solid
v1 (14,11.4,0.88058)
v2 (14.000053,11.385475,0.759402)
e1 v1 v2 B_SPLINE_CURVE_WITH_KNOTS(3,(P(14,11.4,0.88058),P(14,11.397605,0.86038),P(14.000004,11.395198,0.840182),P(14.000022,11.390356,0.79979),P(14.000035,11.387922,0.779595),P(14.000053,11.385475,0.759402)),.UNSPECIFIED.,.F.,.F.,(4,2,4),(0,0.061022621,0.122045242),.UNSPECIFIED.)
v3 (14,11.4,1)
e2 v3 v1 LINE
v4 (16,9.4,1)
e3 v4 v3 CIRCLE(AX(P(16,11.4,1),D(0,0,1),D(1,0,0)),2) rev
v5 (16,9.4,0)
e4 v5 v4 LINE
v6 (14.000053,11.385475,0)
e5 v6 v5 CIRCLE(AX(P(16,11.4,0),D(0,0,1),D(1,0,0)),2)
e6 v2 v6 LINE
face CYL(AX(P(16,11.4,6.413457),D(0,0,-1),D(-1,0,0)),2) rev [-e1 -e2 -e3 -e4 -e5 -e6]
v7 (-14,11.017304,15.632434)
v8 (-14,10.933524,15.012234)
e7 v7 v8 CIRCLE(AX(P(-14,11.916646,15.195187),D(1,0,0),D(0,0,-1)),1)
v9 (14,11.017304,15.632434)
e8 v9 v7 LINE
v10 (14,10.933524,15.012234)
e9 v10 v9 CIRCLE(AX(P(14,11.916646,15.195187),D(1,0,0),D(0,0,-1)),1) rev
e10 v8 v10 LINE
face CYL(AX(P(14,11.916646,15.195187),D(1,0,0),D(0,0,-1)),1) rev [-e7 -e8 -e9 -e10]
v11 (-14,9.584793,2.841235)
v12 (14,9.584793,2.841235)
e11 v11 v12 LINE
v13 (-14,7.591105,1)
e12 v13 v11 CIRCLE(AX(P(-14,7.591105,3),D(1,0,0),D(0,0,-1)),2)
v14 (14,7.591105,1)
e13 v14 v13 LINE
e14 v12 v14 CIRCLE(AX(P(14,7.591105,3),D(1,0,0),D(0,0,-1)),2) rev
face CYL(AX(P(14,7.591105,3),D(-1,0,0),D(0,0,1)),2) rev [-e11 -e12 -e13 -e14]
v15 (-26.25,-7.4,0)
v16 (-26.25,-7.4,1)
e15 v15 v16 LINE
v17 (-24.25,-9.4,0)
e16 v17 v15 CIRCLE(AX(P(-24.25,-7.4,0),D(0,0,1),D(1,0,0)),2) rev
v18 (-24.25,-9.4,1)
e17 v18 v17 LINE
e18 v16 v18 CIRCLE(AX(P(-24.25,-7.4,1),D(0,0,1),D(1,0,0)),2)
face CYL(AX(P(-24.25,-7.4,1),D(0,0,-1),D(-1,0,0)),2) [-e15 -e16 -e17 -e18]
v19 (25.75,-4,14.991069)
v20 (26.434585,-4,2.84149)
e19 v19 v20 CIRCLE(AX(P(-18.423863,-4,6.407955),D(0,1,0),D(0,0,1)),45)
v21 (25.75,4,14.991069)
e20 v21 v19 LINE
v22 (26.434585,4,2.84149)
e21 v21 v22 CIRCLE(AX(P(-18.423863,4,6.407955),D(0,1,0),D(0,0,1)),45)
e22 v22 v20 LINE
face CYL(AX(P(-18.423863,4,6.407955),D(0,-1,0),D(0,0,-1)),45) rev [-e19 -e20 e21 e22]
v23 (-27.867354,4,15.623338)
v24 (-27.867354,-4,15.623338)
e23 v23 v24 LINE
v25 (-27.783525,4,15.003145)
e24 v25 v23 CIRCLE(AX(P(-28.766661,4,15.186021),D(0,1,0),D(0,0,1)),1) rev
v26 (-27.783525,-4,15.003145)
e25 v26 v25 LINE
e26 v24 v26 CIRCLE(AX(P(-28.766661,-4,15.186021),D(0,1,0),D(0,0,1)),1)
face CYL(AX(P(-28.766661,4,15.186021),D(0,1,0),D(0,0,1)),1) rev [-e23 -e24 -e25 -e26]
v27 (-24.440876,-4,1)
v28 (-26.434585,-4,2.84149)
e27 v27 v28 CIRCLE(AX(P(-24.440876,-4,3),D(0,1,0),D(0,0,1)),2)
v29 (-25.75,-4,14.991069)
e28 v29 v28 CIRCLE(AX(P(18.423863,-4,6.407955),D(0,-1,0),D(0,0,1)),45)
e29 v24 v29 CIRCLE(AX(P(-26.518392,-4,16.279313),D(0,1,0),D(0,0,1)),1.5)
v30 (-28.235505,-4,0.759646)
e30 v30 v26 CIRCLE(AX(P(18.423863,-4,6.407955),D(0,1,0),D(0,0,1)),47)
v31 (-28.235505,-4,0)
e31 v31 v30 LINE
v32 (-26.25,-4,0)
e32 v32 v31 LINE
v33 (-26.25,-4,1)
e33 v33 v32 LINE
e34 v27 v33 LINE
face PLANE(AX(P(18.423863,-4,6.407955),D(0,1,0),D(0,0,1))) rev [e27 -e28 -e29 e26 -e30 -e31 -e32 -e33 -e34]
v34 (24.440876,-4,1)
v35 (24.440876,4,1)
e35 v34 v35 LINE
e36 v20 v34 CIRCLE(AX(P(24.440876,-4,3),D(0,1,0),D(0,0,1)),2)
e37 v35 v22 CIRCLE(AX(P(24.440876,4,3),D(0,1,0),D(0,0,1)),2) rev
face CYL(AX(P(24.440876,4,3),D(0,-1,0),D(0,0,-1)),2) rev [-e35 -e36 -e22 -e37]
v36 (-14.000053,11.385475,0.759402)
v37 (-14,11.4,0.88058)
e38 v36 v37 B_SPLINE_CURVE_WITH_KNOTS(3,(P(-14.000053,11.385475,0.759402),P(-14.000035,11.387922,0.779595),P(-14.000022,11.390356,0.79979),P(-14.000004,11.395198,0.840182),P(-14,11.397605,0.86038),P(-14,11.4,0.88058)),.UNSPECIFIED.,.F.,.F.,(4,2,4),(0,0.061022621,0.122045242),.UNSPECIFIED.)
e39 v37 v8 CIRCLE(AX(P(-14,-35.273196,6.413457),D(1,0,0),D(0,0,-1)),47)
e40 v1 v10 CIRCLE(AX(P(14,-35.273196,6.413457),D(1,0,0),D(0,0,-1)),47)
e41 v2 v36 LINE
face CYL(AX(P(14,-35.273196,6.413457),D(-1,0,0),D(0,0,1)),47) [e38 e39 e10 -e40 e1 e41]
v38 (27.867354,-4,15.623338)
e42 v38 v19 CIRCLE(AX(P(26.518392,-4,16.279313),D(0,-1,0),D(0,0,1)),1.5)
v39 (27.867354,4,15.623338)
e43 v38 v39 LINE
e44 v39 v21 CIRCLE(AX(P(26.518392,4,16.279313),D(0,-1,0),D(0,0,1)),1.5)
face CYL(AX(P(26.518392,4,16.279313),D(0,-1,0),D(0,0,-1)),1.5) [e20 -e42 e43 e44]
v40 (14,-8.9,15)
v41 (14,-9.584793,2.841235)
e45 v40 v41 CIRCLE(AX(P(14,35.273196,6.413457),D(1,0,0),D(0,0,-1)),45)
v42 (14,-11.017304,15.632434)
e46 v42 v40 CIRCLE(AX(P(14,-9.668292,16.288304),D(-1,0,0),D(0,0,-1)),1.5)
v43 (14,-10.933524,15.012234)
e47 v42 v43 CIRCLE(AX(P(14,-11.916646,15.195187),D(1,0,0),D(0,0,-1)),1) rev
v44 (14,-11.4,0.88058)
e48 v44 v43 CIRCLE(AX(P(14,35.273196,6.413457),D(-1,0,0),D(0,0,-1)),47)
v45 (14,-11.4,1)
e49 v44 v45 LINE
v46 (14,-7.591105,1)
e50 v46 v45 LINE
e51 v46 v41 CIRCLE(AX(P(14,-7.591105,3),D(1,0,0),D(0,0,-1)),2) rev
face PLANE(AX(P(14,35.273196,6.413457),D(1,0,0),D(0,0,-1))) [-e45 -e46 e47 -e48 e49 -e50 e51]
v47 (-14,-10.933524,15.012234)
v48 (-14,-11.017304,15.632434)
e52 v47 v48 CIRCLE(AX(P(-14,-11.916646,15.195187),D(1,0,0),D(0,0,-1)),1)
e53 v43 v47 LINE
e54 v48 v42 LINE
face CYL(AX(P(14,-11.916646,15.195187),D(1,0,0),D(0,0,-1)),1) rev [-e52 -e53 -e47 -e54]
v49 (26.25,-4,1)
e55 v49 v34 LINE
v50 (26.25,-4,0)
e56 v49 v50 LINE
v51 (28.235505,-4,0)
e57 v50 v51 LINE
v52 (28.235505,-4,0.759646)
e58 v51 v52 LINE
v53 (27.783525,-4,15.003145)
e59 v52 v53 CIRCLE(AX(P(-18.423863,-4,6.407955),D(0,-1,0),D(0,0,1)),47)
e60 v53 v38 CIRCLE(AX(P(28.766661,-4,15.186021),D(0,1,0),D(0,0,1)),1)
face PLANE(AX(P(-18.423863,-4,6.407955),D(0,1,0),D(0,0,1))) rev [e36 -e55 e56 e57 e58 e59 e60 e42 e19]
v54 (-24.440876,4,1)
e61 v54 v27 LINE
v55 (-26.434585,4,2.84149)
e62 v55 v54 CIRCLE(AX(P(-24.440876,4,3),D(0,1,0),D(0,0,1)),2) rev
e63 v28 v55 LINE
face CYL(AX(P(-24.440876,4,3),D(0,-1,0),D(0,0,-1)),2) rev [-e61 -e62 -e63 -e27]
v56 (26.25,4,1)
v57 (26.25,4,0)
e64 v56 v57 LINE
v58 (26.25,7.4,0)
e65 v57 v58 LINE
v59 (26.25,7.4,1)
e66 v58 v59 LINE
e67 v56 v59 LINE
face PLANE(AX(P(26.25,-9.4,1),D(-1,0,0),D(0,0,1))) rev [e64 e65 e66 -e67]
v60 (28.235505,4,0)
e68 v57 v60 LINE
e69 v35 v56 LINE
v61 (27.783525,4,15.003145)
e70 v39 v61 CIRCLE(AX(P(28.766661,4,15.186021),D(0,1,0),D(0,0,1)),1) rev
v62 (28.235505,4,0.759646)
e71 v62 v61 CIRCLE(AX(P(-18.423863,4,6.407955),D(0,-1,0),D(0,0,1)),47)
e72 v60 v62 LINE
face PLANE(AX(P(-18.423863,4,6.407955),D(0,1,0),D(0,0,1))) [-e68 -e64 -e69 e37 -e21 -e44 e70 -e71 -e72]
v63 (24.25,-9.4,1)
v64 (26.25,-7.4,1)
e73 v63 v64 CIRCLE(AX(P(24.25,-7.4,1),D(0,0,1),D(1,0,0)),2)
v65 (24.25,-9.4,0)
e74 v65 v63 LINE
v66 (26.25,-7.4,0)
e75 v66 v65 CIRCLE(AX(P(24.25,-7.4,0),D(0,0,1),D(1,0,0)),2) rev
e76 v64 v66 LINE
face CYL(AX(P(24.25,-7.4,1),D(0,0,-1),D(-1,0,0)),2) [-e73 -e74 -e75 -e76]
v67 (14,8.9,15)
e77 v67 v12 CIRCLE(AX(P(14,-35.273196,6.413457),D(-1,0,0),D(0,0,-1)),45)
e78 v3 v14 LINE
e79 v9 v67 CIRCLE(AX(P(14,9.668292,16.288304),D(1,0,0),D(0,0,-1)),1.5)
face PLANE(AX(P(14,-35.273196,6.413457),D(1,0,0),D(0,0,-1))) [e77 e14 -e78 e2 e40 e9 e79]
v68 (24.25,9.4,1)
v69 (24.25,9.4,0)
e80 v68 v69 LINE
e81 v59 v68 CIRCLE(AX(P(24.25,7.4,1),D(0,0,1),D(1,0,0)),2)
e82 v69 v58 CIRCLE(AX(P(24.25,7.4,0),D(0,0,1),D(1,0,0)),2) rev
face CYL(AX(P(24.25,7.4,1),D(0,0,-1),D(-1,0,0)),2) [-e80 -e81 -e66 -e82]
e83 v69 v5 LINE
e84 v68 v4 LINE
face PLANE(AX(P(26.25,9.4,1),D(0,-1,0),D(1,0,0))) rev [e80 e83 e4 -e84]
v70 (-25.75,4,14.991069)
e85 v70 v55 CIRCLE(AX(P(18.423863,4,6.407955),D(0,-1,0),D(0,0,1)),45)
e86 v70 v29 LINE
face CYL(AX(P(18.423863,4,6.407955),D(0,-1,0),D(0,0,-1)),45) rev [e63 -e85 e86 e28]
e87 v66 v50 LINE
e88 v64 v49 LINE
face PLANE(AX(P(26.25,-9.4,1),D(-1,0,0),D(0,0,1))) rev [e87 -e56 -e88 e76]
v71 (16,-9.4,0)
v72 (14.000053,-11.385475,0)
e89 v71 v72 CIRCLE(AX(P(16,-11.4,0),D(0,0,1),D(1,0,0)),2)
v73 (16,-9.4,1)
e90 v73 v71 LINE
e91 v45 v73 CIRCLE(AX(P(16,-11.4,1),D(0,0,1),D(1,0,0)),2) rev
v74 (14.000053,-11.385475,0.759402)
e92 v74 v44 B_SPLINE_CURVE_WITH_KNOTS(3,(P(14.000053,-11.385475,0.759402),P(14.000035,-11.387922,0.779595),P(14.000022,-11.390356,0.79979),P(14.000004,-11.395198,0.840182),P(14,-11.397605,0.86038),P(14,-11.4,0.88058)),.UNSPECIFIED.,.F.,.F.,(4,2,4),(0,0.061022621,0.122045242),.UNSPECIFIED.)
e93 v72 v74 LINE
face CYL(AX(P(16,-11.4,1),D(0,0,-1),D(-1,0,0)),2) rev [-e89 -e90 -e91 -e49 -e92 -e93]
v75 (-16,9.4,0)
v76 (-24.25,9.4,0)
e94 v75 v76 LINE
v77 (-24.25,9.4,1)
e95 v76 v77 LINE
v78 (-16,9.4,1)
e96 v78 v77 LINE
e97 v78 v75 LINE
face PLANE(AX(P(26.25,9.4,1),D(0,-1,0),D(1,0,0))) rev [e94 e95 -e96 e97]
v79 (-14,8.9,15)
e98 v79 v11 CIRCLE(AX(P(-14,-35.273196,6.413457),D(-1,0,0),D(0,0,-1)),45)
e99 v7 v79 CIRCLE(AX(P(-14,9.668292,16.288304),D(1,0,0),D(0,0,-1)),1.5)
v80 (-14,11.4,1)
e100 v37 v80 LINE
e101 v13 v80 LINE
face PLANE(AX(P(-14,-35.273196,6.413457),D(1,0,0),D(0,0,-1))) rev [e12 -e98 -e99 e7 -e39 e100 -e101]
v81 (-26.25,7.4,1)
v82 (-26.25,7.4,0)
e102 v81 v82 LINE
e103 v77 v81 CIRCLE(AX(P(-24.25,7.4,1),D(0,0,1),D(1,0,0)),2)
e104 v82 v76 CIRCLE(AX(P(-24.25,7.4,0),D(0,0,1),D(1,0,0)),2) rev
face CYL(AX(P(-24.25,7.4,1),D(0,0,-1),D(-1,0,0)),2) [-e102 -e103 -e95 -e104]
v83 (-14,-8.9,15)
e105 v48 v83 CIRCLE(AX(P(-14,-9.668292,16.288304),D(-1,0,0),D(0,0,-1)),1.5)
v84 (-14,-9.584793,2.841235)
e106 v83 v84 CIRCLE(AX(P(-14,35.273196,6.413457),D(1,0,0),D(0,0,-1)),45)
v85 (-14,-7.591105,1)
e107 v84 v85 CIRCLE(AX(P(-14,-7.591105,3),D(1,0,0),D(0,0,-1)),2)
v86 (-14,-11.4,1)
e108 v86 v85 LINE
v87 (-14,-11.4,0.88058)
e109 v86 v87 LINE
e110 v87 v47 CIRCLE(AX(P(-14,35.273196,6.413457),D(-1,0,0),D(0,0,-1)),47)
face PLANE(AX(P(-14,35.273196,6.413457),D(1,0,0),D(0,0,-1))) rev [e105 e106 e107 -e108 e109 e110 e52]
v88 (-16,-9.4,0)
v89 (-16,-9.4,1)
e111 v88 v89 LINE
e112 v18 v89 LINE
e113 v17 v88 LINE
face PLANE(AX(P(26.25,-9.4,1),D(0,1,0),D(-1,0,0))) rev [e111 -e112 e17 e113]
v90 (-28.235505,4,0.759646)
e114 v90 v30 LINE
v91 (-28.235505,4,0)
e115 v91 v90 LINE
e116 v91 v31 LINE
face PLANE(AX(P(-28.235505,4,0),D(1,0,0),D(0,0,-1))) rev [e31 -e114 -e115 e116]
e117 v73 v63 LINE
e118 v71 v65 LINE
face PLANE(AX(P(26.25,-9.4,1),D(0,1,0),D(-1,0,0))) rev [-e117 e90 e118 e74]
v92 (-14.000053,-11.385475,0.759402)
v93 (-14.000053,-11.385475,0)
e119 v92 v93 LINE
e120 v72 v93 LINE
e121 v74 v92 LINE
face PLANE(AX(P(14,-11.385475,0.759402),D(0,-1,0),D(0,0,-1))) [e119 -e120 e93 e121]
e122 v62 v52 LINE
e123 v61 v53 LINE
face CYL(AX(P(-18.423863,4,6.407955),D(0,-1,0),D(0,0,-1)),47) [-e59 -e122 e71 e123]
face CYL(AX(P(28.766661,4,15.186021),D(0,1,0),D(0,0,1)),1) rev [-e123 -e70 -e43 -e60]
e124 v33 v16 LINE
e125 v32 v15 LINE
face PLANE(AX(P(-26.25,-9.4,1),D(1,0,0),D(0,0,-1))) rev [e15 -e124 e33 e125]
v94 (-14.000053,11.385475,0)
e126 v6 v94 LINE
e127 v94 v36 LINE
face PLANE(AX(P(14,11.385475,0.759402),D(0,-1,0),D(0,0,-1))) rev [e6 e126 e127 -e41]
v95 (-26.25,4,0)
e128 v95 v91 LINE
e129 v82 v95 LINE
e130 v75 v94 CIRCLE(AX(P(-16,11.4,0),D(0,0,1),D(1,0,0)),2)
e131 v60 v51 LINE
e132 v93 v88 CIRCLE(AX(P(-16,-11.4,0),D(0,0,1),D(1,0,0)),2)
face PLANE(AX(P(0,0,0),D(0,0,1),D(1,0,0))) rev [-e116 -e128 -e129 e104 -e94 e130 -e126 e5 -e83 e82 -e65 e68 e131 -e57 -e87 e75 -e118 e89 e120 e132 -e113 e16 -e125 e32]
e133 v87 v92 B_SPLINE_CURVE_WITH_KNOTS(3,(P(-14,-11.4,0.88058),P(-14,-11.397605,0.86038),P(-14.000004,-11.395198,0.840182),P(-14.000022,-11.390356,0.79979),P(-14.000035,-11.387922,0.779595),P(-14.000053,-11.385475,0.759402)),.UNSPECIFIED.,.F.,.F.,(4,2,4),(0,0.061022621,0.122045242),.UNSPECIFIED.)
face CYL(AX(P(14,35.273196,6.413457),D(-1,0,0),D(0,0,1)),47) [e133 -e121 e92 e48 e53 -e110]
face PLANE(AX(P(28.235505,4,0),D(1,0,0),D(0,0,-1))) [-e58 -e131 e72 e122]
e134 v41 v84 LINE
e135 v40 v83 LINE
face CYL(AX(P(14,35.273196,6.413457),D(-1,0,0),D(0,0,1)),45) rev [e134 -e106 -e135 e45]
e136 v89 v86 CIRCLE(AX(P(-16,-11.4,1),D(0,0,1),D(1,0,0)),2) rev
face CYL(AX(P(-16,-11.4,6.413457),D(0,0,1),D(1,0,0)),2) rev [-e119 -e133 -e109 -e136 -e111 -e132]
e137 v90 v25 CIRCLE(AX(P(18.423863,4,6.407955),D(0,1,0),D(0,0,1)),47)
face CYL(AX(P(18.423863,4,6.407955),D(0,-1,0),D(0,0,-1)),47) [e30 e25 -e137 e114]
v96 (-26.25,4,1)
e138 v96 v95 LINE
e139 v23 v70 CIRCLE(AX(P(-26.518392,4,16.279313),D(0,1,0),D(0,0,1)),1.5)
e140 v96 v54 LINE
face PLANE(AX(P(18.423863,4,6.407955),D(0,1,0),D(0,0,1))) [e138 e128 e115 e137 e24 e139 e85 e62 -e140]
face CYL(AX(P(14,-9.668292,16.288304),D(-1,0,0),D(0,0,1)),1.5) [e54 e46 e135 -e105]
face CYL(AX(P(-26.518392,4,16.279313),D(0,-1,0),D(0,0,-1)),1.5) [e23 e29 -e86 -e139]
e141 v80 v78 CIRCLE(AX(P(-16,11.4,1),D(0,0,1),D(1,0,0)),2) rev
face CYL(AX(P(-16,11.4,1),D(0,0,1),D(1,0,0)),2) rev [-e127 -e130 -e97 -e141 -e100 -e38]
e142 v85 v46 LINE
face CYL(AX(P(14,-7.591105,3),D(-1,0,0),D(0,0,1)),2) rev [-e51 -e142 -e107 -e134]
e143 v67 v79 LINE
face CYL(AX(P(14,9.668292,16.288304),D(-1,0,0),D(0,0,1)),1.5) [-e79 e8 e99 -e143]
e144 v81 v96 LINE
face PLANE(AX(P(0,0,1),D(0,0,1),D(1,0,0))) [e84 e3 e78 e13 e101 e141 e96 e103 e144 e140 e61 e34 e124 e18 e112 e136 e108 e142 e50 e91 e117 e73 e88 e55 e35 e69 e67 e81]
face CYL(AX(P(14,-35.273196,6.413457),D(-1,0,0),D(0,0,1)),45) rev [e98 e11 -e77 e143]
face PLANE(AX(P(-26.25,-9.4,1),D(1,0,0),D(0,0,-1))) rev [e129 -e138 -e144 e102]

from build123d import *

# Parameters (mm, degrees)
SKETCH1_W           = 52.5
SKETCH1_H           = 18.8
BOSS_EXTRUDE1_DEPTH = 1
BOSS_EXTRUDE2_DEPTH = 4
BOSS_EXTRUDE3_DEPTH = 14
FILLET1_R           = 2
FILLET2_R           = 2
FILLET3_R           = 1


with BuildPart() as part:
    # Sketch1 → Boss-Extrude1 (new body)
    with BuildSketch(Plane.XY):
        Rectangle(SKETCH1_W, SKETCH1_H)
    extrude(amount=BOSS_EXTRUDE1_DEPTH)

    # Sketch2 → Boss-Extrude2 (add, symmetric)
    with BuildSketch(Plane(origin=(0, 0, 0), x_dir=(1, 0, 0), z_dir=(0, 1, 0))):
        with BuildLine():
            Line((-26.25, 0), (-26.25, -1))
            ThreePointArc((-26.25, -1), (-26.547428998, -8.015097806), (-25.75, -14.99106858))
            ThreePointArc((-25.75, -14.99106858), (-26.232288437, -17.75177498), (-27.713282794, -15.372540297))
            ThreePointArc((-27.713282794, -15.372540297), (-28.546153081, -8.086526378), (-28.235505016, -0.759646447))
            Line((-28.235505016, -0.759646447), (-28.235505016, 0))
            Line((-28.235505016, 0), (-26.25, 0))
        make_face()
    boss_extrude2 = extrude(amount=BOSS_EXTRUDE2_DEPTH, both=True)

    # Mirror1: Boss-Extrude2 across plane
    add(boss_extrude2.mirror(Plane(origin=(0, 0, 0), x_dir=(0, 0, 1), z_dir=(1, 0, 0))))

    # Sketch3 → Boss-Extrude3 (add, symmetric)
    with BuildSketch(Plane(origin=(0, 0, 0), x_dir=(0, 0, -1), z_dir=(1, 0, 0))):
        with BuildLine():
            Line((0, 9.4), (-1, 9.4))
            ThreePointArc((-1, 9.4), (-8.019576143, 9.698132003), (-15, 8.9))
            ThreePointArc((-15, 8.9), (-17.760743831, 9.382074127), (-15.381624121, 10.863253175))
            ThreePointArc((-15.381624121, 10.863253175), (-8.090959204, 11.696857712), (-0.759401899, 11.385475397))
            Line((-0.759401899, 11.385475397), (0, 11.385475397))
            Line((0, 11.385475397), (0, 9.4))
        make_face()
    boss_extrude3 = extrude(amount=BOSS_EXTRUDE3_DEPTH, both=True)

    # Mirror2: Boss-Extrude3 across plane
    add(boss_extrude3.mirror(Plane.ZX))

    # Fillet1
    fillet1_edges = [part.edges().sort_by_distance(p)[0] for p in [
        (0, 9.4, 1),
        (-26.25, 0, 1),
        (0, -9.4, 1),
        (26.25, 0, 1),
        (26.25, -9.4, 0.5),
        (26.25, 9.4, 0.5),
        (-26.25, -9.4, 0.5),
        (-26.25, 9.4, 0.5),
    ]]
    fillet(fillet1_edges, radius=FILLET1_R)

    # Fillet2
    # the kernel refuses this fillet: 2 mm, written as the material it adds along each edge
    with BuildSketch(Plane(origin=(-14, -9.4, 0), x_dir=(0, -1, 0), z_dir=(0, 0, 1))) as fillet2_piece_1_section:
        with BuildLine():
            CenterArc((FILLET2_R, -FILLET2_R), FILLET2_R, 90, 90)
            Line((0, -FILLET2_R), (0, 0))
            Line((0, 0), (FILLET2_R, 0))
        make_face()
    fillet2_piece_1 = extrude(amount=1, mode=Mode.PRIVATE)
    fillet2_piece_1 = split(fillet2_piece_1, bisect_by=Plane(origin=(-14.000636708, -11.385475397, 0.169006007), z_dir=(0, 1, 0)), keep=Keep.TOP, mode=Mode.PRIVATE)
    add(fillet2_piece_1)
    with BuildSketch(Plane(origin=(-14, -9.4, -5), x_dir=(0, -1, 0), z_dir=(0, 0, 1))) as fillet2_piece_2_section:
        with BuildLine():
            CenterArc((FILLET2_R, -FILLET2_R), FILLET2_R, 90, 90)
            Line((0, -FILLET2_R), (0, 0))
            Line((0, 0), (FILLET2_R, 0))
        make_face()
    fillet2_piece_2 = extrude(amount=6, mode=Mode.PRIVATE)
    fillet2_piece_2 = split(fillet2_piece_2, bisect_by=Plane(origin=(-14.000016578, -11.385475397, 0.893450241), z_dir=(0, -1, 0)), keep=Keep.TOP, mode=Mode.PRIVATE)
    fillet2_piece_2 = fillet2_piece_2 & Plane(origin=(-14.000016578, 35.273196442, 6.41345727), x_dir=(0, -0.9816265876102759, 0.19081206066862103), z_dir=(1, 0, 0)) * Cylinder(47, 21, mode=Mode.PRIVATE)
    add(fillet2_piece_2)
    with BuildSketch(Plane(origin=(14, -9.4, 0), x_dir=(1, 0, 0), z_dir=(0, 0, 1))) as fillet2_piece_3_section:
        with BuildLine():
            CenterArc((FILLET2_R, -FILLET2_R), FILLET2_R, 90, 90)
            Line((0, -FILLET2_R), (0, 0))
            Line((0, 0), (FILLET2_R, 0))
        make_face()
    fillet2_piece_3 = extrude(amount=1, mode=Mode.PRIVATE)
    fillet2_piece_3 = split(fillet2_piece_3, bisect_by=Plane(origin=(14.446749005, -11.385475397, 0.500009641), z_dir=(0, 1, 0)), keep=Keep.TOP, mode=Mode.PRIVATE)
    add(fillet2_piece_3)
    with BuildSketch(Plane(origin=(14, -9.4, -5), x_dir=(1, 0, 0), z_dir=(0, 0, 1))) as fillet2_piece_4_section:
        with BuildLine():
            CenterArc((FILLET2_R, -FILLET2_R), FILLET2_R, 90, 90)
            Line((0, -FILLET2_R), (0, 0))
            Line((0, 0), (FILLET2_R, 0))
        make_face()
    fillet2_piece_4 = extrude(amount=6, mode=Mode.PRIVATE)
    fillet2_piece_4 = split(fillet2_piece_4, bisect_by=Plane(origin=(14.000016578, -11.385475397, 0.893450335), z_dir=(0, -1, 0)), keep=Keep.TOP, mode=Mode.PRIVATE)
    fillet2_piece_4 = fillet2_piece_4 & Plane(origin=(14.000016578, 35.273196442, 6.41345727), x_dir=(0, -0.9816265876102759, 0.19081206066862103), z_dir=(1, 0, 0)) * Cylinder(47, 20, mode=Mode.PRIVATE)
    add(fillet2_piece_4)
    with BuildSketch(Plane(origin=(14, 9.4, 0), x_dir=(1, 0, 0), z_dir=(0, 0, 1))) as fillet2_piece_5_section:
        with BuildLine():
            CenterArc((FILLET2_R, FILLET2_R), FILLET2_R, 180, 90)
            Line((0, FILLET2_R), (0, 0))
            Line((0, 0), (FILLET2_R, 0))
        make_face()
    fillet2_piece_5 = extrude(amount=1, mode=Mode.PRIVATE)
    fillet2_piece_5 = split(fillet2_piece_5, bisect_by=Plane(origin=(14.446749005, 11.385475397, 0.500009641), z_dir=(0, -1, 0)), keep=Keep.TOP, mode=Mode.PRIVATE)
    add(fillet2_piece_5)
    with BuildSketch(Plane(origin=(14, 9.4, -5), x_dir=(1, 0, 0), z_dir=(0, 0, 1))) as fillet2_piece_6_section:
        with BuildLine():
            CenterArc((FILLET2_R, FILLET2_R), FILLET2_R, 180, 90)
            Line((0, FILLET2_R), (0, 0))
            Line((0, 0), (FILLET2_R, 0))
        make_face()
    fillet2_piece_6 = extrude(amount=6, mode=Mode.PRIVATE)
    fillet2_piece_6 = split(fillet2_piece_6, bisect_by=Plane(origin=(14.000016578, 11.385475397, 0.893450335), z_dir=(0, 1, 0)), keep=Keep.TOP, mode=Mode.PRIVATE)
    fillet2_piece_6 = fillet2_piece_6 & Plane(origin=(14.000016578, -35.273196442, 6.41345727), x_dir=(0, 0.9816265876102759, 0.19081206066862103), z_dir=(1, 0, 0)) * Cylinder(47, 21, mode=Mode.PRIVATE)
    add(fillet2_piece_6)
    with BuildSketch(Plane(origin=(-14, 9.4, 0), x_dir=(0, 1, 0), z_dir=(0, 0, 1))) as fillet2_piece_7_section:
        with BuildLine():
            CenterArc((FILLET2_R, FILLET2_R), FILLET2_R, 180, 90)
            Line((0, FILLET2_R), (0, 0))
            Line((0, 0), (FILLET2_R, 0))
        make_face()
    fillet2_piece_7 = extrude(amount=1, mode=Mode.PRIVATE)
    fillet2_piece_7 = split(fillet2_piece_7, bisect_by=Plane(origin=(-14.000636708, 11.385475397, 0.169006007), z_dir=(0, -1, 0)), keep=Keep.TOP, mode=Mode.PRIVATE)
    add(fillet2_piece_7)
    with BuildSketch(Plane(origin=(-14, 9.4, -5), x_dir=(0, 1, 0), z_dir=(0, 0, 1))) as fillet2_piece_8_section:
        with BuildLine():
            CenterArc((FILLET2_R, FILLET2_R), FILLET2_R, 180, 90)
            Line((0, FILLET2_R), (0, 0))
            Line((0, 0), (FILLET2_R, 0))
        make_face()
    fillet2_piece_8 = extrude(amount=6, mode=Mode.PRIVATE)
    fillet2_piece_8 = split(fillet2_piece_8, bisect_by=Plane(origin=(-14.000016578, 11.385475397, 0.893450241), z_dir=(0, 1, 0)), keep=Keep.TOP, mode=Mode.PRIVATE)
    fillet2_piece_8 = fillet2_piece_8 & Plane(origin=(-14.000016578, -35.273196442, 6.41345727), x_dir=(0, 0.9816265876102759, 0.19081206066862103), z_dir=(1, 0, 0)) * Cylinder(47, 20, mode=Mode.PRIVATE)
    add(fillet2_piece_8)

    # Fillet3
    fillet3_edges = [part.edges().sort_by_distance(p)[0] for p in [
        (-27.713282794, 0, 15.372540297),
        (27.713282794, 0, 15.372540297),
        (0, 10.863253175, 15.381624121),
        (0, -10.863253175, 15.381624121),
    ]]
    fillet(fillet3_edges, radius=FILLET3_R)


solid = part.part
